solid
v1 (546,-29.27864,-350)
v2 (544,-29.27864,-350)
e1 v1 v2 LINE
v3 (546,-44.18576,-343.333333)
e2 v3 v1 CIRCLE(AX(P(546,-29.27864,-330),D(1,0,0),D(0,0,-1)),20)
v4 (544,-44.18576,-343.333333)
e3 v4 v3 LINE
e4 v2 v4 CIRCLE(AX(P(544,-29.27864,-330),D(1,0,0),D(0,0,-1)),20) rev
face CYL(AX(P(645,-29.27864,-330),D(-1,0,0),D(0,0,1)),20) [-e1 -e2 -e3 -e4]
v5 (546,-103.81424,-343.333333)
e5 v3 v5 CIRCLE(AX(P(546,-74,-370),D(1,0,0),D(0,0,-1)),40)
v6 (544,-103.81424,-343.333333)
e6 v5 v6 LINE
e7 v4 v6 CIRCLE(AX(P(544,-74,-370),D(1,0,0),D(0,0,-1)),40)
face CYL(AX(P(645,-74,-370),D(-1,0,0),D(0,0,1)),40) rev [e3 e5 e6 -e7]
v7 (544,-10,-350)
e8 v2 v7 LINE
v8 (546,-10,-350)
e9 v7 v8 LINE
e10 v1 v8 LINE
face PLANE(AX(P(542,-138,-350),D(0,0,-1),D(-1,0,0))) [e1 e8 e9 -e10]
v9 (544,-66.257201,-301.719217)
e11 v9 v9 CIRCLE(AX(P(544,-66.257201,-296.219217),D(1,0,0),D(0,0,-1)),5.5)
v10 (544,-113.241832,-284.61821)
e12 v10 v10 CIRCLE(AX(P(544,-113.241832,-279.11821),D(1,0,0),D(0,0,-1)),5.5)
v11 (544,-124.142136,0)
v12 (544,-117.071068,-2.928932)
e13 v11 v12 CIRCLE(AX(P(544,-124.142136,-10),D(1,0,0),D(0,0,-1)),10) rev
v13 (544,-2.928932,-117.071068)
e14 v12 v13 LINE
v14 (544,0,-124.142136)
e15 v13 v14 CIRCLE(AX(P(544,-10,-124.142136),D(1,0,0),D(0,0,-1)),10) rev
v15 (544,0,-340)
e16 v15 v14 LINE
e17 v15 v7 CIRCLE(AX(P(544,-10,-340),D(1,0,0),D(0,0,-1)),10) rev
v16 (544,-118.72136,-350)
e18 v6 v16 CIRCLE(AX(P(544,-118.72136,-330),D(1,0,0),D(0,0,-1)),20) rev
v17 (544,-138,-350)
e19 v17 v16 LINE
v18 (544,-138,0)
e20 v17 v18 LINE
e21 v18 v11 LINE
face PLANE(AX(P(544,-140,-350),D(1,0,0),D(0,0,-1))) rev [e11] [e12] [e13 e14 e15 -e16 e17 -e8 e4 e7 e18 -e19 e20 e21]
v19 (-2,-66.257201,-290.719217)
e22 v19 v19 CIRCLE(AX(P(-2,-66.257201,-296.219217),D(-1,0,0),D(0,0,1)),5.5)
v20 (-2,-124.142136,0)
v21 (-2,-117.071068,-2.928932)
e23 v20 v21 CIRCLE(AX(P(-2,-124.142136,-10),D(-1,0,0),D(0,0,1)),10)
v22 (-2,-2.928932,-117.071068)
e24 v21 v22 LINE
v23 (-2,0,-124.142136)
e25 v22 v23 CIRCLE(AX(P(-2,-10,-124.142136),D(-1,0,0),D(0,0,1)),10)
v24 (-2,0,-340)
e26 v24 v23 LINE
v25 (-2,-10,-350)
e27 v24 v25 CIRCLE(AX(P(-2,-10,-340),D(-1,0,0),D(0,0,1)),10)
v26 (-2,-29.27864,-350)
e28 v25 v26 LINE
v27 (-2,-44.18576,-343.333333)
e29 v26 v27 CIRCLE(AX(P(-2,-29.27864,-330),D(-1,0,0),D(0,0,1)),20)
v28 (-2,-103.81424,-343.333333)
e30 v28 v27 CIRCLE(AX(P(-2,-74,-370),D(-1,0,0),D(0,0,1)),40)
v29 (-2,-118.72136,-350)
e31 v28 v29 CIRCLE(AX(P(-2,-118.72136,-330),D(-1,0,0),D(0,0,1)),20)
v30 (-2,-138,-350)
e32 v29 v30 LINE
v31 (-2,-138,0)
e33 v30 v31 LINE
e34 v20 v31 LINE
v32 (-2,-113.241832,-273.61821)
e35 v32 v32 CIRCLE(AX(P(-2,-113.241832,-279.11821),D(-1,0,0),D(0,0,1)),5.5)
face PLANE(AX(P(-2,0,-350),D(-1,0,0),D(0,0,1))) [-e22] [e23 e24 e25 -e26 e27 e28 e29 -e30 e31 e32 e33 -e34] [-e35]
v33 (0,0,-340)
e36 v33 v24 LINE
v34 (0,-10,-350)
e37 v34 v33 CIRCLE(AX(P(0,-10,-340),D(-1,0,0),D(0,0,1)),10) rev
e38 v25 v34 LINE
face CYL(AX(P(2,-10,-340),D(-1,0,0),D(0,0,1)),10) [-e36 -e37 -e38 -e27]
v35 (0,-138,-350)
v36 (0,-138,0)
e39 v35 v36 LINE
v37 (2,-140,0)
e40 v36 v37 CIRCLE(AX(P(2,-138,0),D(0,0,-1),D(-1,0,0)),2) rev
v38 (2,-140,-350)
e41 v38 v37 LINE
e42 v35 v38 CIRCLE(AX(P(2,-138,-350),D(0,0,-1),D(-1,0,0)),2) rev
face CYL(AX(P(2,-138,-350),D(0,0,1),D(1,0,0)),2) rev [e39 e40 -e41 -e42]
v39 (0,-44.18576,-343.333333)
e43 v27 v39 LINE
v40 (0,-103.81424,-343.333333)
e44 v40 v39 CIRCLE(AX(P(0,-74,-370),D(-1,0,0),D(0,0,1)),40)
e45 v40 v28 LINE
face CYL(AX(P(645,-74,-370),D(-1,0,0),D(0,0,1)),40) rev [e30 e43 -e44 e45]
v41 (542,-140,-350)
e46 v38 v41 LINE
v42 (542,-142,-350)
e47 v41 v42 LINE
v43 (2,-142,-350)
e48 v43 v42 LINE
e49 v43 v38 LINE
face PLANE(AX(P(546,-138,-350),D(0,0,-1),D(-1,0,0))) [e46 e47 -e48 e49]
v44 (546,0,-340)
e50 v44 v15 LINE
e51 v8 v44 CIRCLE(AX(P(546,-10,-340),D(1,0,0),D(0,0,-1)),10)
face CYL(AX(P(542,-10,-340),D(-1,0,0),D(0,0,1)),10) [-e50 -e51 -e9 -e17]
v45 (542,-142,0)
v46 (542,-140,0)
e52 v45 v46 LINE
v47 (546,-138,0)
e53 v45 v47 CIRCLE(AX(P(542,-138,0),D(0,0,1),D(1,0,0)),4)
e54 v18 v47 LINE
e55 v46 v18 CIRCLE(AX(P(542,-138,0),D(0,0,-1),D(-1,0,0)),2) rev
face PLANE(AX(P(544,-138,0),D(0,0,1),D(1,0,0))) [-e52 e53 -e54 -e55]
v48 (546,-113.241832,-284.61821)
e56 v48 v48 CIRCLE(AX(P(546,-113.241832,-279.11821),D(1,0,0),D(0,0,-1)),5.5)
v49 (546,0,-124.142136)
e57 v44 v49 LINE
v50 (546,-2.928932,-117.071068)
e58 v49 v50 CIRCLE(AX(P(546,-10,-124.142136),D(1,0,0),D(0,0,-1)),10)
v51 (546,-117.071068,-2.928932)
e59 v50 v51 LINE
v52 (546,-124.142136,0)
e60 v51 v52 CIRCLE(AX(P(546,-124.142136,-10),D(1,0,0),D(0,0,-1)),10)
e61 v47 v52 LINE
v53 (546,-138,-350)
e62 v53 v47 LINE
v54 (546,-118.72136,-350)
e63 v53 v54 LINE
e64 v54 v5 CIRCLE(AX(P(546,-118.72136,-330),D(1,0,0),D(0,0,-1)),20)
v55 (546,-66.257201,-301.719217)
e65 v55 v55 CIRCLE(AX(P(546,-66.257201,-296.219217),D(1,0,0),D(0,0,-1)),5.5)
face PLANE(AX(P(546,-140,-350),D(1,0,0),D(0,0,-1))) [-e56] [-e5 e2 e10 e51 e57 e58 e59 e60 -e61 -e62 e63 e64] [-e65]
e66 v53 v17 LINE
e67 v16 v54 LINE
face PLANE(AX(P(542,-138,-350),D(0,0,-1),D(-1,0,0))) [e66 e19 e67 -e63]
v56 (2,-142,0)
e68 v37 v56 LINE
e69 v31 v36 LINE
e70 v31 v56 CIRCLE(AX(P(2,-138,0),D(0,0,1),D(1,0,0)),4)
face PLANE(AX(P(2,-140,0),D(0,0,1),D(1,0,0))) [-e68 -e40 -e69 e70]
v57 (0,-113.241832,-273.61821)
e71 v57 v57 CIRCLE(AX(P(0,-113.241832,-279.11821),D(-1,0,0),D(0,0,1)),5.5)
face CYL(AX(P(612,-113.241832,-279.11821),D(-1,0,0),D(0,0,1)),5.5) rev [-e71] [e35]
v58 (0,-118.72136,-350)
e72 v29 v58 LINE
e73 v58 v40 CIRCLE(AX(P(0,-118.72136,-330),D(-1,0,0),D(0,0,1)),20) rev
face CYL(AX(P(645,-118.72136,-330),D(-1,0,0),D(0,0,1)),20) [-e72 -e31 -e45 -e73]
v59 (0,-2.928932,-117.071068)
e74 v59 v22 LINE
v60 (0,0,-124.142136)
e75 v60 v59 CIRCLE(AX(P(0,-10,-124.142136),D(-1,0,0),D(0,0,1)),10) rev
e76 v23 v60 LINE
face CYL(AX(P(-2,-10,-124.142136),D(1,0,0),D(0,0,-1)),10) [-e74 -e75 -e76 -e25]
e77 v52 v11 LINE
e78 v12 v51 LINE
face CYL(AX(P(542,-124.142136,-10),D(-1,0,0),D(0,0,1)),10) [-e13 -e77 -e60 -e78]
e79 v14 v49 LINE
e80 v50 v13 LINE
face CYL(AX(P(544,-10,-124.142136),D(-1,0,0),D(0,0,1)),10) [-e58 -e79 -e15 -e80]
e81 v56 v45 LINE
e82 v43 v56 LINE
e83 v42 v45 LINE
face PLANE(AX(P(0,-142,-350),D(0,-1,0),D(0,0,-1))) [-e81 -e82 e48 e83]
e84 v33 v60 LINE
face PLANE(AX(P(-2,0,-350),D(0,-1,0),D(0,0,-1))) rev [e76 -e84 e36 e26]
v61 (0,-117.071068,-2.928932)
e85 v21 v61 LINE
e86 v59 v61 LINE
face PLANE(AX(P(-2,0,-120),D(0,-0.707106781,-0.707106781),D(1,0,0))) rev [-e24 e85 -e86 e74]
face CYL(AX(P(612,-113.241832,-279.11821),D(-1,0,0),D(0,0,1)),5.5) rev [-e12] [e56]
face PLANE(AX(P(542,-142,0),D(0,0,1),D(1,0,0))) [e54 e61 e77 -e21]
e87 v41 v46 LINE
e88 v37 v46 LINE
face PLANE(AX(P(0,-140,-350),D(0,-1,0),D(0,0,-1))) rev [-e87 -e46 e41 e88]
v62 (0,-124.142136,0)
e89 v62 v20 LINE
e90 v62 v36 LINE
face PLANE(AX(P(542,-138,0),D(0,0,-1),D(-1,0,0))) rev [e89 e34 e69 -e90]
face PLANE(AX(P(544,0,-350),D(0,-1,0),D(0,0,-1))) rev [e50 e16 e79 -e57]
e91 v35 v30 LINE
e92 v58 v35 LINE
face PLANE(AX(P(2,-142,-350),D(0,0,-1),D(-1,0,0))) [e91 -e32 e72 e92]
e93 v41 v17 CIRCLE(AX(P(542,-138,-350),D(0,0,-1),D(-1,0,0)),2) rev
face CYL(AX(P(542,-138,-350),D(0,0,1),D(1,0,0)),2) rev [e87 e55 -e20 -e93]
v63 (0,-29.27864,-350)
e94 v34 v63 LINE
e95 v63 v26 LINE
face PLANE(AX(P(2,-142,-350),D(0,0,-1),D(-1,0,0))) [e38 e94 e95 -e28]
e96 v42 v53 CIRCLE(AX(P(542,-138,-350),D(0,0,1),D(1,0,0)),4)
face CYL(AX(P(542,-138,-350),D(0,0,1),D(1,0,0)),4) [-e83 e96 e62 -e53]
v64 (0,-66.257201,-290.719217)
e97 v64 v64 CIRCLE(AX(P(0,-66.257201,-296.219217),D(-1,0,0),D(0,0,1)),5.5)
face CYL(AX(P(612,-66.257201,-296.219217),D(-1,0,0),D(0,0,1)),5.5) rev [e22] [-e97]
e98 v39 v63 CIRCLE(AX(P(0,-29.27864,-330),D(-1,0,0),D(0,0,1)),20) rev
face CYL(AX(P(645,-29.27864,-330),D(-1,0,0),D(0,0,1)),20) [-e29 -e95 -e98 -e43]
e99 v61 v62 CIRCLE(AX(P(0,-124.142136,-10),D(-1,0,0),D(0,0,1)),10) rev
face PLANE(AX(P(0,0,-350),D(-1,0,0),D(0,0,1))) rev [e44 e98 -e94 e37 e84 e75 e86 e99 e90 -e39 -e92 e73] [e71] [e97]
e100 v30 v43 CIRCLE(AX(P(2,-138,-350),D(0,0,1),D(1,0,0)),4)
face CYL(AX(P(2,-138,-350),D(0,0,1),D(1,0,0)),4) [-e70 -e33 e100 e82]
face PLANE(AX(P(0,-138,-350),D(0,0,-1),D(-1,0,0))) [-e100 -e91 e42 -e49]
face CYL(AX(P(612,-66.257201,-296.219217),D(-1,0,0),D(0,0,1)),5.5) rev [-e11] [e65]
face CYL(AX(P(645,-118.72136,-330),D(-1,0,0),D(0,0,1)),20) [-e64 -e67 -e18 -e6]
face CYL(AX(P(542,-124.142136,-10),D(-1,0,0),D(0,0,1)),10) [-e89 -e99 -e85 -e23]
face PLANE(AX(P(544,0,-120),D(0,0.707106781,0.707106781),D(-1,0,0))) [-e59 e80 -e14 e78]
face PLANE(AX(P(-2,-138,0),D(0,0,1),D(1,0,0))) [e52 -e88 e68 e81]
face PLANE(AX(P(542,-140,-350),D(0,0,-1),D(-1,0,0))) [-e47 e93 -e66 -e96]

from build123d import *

# Parameters (mm, degrees)
TABAN_FLAN_1_DEPTH    = 350
PAH1_SIZE             = 120
IZIM2_R               = 5.5
KES_EKSTR_ZYON1_DEPTH = 614
RADYUS1_R             = 10
RADYUS2_R             = 10
IZIM3_R               = 40
KES_EKSTR_ZYON2_DEPTH = 647
RADYUS3_R             = 20


# Sheet-metal steps are written as plain solids
with BuildPart() as part:
    # Çizim1 → Taban-Flanş1 (new body)
    with BuildSketch(Plane.XY):
        with BuildLine():
            Line((0, 0), (0, -138))
            ThreePointArc((0, -138), (0.585786438, -139.414213562), (2, -140))
            Line((2, -140), (542, -140))
            ThreePointArc((542, -140), (543.414213562, -139.414213562), (544, -138))
            Line((544, -138), (544, 0))
            Line((544, 0), (546, 0))
            Line((546, 0), (546, -138))
            ThreePointArc((546, -138), (544.828427125, -140.828427125), (542, -142))
            Line((542, -142), (2, -142))
            ThreePointArc((2, -142), (-0.828427125, -140.828427125), (-2, -138))
            Line((-2, -138), (-2, 0))
            Line((-2, 0), (0, 0))
        make_face()
    extrude(amount=-TABAN_FLAN_1_DEPTH)

    # Pah1
    pah1_edges = [part.edges().sort_by_distance(p)[0] for p in [
        (-1, 0, 0),
        (545, 0, 0),
    ]]
    chamfer(pah1_edges, length=PAH1_SIZE)

    # Çizim2 → Kes-Ekstrüzyon1 (cut)
    with BuildSketch(Plane.ZY.offset(2)):
        with Locations(Location((-279.118209744, -113.241831987, 0), (0, 0, 180))):
            Circle(IZIM2_R)
        with Locations(Location((-296.219216911, -66.257200948, 0), (0, 0, 180))):
            Circle(IZIM2_R)
    extrude(amount=-KES_EKSTR_ZYON1_DEPTH, mode=Mode.SUBTRACT)

    # Radyus1
    radyus1_edges = [part.edges().sort_by_distance(p)[0] for p in [
        (-1, 0, -350),
        (545, 0, -120),
        (-1, 0, -120),
        (545, 0, -350),
    ]]
    fillet(radyus1_edges, radius=RADYUS1_R)

    # Radyus2
    radyus2_edges = [part.edges().sort_by_distance(p)[0] for p in [
        (545, -120, 0),
        (-1, -120, 0),
    ]]
    fillet(radyus2_edges, radius=RADYUS2_R)

    # Çizim3 → Kes-Ekstrüzyon2 (cut)
    with BuildSketch(Plane.ZY.offset(2)):
        with Locations((-370, -74)):
            Circle(IZIM3_R)
    extrude(amount=-KES_EKSTR_ZYON2_DEPTH, mode=Mode.SUBTRACT)

    # Radyus3
    radyus3_edges = [part.edges().sort_by_distance(p)[0] for p in [
        (545, -39.358983849, -350),
        (545, -108.641016151, -350),
        (-1, -108.641016151, -350),
        (-1, -39.358983849, -350),
    ]]
    fillet(radyus3_edges, radius=RADYUS3_R)


solid = part.part
